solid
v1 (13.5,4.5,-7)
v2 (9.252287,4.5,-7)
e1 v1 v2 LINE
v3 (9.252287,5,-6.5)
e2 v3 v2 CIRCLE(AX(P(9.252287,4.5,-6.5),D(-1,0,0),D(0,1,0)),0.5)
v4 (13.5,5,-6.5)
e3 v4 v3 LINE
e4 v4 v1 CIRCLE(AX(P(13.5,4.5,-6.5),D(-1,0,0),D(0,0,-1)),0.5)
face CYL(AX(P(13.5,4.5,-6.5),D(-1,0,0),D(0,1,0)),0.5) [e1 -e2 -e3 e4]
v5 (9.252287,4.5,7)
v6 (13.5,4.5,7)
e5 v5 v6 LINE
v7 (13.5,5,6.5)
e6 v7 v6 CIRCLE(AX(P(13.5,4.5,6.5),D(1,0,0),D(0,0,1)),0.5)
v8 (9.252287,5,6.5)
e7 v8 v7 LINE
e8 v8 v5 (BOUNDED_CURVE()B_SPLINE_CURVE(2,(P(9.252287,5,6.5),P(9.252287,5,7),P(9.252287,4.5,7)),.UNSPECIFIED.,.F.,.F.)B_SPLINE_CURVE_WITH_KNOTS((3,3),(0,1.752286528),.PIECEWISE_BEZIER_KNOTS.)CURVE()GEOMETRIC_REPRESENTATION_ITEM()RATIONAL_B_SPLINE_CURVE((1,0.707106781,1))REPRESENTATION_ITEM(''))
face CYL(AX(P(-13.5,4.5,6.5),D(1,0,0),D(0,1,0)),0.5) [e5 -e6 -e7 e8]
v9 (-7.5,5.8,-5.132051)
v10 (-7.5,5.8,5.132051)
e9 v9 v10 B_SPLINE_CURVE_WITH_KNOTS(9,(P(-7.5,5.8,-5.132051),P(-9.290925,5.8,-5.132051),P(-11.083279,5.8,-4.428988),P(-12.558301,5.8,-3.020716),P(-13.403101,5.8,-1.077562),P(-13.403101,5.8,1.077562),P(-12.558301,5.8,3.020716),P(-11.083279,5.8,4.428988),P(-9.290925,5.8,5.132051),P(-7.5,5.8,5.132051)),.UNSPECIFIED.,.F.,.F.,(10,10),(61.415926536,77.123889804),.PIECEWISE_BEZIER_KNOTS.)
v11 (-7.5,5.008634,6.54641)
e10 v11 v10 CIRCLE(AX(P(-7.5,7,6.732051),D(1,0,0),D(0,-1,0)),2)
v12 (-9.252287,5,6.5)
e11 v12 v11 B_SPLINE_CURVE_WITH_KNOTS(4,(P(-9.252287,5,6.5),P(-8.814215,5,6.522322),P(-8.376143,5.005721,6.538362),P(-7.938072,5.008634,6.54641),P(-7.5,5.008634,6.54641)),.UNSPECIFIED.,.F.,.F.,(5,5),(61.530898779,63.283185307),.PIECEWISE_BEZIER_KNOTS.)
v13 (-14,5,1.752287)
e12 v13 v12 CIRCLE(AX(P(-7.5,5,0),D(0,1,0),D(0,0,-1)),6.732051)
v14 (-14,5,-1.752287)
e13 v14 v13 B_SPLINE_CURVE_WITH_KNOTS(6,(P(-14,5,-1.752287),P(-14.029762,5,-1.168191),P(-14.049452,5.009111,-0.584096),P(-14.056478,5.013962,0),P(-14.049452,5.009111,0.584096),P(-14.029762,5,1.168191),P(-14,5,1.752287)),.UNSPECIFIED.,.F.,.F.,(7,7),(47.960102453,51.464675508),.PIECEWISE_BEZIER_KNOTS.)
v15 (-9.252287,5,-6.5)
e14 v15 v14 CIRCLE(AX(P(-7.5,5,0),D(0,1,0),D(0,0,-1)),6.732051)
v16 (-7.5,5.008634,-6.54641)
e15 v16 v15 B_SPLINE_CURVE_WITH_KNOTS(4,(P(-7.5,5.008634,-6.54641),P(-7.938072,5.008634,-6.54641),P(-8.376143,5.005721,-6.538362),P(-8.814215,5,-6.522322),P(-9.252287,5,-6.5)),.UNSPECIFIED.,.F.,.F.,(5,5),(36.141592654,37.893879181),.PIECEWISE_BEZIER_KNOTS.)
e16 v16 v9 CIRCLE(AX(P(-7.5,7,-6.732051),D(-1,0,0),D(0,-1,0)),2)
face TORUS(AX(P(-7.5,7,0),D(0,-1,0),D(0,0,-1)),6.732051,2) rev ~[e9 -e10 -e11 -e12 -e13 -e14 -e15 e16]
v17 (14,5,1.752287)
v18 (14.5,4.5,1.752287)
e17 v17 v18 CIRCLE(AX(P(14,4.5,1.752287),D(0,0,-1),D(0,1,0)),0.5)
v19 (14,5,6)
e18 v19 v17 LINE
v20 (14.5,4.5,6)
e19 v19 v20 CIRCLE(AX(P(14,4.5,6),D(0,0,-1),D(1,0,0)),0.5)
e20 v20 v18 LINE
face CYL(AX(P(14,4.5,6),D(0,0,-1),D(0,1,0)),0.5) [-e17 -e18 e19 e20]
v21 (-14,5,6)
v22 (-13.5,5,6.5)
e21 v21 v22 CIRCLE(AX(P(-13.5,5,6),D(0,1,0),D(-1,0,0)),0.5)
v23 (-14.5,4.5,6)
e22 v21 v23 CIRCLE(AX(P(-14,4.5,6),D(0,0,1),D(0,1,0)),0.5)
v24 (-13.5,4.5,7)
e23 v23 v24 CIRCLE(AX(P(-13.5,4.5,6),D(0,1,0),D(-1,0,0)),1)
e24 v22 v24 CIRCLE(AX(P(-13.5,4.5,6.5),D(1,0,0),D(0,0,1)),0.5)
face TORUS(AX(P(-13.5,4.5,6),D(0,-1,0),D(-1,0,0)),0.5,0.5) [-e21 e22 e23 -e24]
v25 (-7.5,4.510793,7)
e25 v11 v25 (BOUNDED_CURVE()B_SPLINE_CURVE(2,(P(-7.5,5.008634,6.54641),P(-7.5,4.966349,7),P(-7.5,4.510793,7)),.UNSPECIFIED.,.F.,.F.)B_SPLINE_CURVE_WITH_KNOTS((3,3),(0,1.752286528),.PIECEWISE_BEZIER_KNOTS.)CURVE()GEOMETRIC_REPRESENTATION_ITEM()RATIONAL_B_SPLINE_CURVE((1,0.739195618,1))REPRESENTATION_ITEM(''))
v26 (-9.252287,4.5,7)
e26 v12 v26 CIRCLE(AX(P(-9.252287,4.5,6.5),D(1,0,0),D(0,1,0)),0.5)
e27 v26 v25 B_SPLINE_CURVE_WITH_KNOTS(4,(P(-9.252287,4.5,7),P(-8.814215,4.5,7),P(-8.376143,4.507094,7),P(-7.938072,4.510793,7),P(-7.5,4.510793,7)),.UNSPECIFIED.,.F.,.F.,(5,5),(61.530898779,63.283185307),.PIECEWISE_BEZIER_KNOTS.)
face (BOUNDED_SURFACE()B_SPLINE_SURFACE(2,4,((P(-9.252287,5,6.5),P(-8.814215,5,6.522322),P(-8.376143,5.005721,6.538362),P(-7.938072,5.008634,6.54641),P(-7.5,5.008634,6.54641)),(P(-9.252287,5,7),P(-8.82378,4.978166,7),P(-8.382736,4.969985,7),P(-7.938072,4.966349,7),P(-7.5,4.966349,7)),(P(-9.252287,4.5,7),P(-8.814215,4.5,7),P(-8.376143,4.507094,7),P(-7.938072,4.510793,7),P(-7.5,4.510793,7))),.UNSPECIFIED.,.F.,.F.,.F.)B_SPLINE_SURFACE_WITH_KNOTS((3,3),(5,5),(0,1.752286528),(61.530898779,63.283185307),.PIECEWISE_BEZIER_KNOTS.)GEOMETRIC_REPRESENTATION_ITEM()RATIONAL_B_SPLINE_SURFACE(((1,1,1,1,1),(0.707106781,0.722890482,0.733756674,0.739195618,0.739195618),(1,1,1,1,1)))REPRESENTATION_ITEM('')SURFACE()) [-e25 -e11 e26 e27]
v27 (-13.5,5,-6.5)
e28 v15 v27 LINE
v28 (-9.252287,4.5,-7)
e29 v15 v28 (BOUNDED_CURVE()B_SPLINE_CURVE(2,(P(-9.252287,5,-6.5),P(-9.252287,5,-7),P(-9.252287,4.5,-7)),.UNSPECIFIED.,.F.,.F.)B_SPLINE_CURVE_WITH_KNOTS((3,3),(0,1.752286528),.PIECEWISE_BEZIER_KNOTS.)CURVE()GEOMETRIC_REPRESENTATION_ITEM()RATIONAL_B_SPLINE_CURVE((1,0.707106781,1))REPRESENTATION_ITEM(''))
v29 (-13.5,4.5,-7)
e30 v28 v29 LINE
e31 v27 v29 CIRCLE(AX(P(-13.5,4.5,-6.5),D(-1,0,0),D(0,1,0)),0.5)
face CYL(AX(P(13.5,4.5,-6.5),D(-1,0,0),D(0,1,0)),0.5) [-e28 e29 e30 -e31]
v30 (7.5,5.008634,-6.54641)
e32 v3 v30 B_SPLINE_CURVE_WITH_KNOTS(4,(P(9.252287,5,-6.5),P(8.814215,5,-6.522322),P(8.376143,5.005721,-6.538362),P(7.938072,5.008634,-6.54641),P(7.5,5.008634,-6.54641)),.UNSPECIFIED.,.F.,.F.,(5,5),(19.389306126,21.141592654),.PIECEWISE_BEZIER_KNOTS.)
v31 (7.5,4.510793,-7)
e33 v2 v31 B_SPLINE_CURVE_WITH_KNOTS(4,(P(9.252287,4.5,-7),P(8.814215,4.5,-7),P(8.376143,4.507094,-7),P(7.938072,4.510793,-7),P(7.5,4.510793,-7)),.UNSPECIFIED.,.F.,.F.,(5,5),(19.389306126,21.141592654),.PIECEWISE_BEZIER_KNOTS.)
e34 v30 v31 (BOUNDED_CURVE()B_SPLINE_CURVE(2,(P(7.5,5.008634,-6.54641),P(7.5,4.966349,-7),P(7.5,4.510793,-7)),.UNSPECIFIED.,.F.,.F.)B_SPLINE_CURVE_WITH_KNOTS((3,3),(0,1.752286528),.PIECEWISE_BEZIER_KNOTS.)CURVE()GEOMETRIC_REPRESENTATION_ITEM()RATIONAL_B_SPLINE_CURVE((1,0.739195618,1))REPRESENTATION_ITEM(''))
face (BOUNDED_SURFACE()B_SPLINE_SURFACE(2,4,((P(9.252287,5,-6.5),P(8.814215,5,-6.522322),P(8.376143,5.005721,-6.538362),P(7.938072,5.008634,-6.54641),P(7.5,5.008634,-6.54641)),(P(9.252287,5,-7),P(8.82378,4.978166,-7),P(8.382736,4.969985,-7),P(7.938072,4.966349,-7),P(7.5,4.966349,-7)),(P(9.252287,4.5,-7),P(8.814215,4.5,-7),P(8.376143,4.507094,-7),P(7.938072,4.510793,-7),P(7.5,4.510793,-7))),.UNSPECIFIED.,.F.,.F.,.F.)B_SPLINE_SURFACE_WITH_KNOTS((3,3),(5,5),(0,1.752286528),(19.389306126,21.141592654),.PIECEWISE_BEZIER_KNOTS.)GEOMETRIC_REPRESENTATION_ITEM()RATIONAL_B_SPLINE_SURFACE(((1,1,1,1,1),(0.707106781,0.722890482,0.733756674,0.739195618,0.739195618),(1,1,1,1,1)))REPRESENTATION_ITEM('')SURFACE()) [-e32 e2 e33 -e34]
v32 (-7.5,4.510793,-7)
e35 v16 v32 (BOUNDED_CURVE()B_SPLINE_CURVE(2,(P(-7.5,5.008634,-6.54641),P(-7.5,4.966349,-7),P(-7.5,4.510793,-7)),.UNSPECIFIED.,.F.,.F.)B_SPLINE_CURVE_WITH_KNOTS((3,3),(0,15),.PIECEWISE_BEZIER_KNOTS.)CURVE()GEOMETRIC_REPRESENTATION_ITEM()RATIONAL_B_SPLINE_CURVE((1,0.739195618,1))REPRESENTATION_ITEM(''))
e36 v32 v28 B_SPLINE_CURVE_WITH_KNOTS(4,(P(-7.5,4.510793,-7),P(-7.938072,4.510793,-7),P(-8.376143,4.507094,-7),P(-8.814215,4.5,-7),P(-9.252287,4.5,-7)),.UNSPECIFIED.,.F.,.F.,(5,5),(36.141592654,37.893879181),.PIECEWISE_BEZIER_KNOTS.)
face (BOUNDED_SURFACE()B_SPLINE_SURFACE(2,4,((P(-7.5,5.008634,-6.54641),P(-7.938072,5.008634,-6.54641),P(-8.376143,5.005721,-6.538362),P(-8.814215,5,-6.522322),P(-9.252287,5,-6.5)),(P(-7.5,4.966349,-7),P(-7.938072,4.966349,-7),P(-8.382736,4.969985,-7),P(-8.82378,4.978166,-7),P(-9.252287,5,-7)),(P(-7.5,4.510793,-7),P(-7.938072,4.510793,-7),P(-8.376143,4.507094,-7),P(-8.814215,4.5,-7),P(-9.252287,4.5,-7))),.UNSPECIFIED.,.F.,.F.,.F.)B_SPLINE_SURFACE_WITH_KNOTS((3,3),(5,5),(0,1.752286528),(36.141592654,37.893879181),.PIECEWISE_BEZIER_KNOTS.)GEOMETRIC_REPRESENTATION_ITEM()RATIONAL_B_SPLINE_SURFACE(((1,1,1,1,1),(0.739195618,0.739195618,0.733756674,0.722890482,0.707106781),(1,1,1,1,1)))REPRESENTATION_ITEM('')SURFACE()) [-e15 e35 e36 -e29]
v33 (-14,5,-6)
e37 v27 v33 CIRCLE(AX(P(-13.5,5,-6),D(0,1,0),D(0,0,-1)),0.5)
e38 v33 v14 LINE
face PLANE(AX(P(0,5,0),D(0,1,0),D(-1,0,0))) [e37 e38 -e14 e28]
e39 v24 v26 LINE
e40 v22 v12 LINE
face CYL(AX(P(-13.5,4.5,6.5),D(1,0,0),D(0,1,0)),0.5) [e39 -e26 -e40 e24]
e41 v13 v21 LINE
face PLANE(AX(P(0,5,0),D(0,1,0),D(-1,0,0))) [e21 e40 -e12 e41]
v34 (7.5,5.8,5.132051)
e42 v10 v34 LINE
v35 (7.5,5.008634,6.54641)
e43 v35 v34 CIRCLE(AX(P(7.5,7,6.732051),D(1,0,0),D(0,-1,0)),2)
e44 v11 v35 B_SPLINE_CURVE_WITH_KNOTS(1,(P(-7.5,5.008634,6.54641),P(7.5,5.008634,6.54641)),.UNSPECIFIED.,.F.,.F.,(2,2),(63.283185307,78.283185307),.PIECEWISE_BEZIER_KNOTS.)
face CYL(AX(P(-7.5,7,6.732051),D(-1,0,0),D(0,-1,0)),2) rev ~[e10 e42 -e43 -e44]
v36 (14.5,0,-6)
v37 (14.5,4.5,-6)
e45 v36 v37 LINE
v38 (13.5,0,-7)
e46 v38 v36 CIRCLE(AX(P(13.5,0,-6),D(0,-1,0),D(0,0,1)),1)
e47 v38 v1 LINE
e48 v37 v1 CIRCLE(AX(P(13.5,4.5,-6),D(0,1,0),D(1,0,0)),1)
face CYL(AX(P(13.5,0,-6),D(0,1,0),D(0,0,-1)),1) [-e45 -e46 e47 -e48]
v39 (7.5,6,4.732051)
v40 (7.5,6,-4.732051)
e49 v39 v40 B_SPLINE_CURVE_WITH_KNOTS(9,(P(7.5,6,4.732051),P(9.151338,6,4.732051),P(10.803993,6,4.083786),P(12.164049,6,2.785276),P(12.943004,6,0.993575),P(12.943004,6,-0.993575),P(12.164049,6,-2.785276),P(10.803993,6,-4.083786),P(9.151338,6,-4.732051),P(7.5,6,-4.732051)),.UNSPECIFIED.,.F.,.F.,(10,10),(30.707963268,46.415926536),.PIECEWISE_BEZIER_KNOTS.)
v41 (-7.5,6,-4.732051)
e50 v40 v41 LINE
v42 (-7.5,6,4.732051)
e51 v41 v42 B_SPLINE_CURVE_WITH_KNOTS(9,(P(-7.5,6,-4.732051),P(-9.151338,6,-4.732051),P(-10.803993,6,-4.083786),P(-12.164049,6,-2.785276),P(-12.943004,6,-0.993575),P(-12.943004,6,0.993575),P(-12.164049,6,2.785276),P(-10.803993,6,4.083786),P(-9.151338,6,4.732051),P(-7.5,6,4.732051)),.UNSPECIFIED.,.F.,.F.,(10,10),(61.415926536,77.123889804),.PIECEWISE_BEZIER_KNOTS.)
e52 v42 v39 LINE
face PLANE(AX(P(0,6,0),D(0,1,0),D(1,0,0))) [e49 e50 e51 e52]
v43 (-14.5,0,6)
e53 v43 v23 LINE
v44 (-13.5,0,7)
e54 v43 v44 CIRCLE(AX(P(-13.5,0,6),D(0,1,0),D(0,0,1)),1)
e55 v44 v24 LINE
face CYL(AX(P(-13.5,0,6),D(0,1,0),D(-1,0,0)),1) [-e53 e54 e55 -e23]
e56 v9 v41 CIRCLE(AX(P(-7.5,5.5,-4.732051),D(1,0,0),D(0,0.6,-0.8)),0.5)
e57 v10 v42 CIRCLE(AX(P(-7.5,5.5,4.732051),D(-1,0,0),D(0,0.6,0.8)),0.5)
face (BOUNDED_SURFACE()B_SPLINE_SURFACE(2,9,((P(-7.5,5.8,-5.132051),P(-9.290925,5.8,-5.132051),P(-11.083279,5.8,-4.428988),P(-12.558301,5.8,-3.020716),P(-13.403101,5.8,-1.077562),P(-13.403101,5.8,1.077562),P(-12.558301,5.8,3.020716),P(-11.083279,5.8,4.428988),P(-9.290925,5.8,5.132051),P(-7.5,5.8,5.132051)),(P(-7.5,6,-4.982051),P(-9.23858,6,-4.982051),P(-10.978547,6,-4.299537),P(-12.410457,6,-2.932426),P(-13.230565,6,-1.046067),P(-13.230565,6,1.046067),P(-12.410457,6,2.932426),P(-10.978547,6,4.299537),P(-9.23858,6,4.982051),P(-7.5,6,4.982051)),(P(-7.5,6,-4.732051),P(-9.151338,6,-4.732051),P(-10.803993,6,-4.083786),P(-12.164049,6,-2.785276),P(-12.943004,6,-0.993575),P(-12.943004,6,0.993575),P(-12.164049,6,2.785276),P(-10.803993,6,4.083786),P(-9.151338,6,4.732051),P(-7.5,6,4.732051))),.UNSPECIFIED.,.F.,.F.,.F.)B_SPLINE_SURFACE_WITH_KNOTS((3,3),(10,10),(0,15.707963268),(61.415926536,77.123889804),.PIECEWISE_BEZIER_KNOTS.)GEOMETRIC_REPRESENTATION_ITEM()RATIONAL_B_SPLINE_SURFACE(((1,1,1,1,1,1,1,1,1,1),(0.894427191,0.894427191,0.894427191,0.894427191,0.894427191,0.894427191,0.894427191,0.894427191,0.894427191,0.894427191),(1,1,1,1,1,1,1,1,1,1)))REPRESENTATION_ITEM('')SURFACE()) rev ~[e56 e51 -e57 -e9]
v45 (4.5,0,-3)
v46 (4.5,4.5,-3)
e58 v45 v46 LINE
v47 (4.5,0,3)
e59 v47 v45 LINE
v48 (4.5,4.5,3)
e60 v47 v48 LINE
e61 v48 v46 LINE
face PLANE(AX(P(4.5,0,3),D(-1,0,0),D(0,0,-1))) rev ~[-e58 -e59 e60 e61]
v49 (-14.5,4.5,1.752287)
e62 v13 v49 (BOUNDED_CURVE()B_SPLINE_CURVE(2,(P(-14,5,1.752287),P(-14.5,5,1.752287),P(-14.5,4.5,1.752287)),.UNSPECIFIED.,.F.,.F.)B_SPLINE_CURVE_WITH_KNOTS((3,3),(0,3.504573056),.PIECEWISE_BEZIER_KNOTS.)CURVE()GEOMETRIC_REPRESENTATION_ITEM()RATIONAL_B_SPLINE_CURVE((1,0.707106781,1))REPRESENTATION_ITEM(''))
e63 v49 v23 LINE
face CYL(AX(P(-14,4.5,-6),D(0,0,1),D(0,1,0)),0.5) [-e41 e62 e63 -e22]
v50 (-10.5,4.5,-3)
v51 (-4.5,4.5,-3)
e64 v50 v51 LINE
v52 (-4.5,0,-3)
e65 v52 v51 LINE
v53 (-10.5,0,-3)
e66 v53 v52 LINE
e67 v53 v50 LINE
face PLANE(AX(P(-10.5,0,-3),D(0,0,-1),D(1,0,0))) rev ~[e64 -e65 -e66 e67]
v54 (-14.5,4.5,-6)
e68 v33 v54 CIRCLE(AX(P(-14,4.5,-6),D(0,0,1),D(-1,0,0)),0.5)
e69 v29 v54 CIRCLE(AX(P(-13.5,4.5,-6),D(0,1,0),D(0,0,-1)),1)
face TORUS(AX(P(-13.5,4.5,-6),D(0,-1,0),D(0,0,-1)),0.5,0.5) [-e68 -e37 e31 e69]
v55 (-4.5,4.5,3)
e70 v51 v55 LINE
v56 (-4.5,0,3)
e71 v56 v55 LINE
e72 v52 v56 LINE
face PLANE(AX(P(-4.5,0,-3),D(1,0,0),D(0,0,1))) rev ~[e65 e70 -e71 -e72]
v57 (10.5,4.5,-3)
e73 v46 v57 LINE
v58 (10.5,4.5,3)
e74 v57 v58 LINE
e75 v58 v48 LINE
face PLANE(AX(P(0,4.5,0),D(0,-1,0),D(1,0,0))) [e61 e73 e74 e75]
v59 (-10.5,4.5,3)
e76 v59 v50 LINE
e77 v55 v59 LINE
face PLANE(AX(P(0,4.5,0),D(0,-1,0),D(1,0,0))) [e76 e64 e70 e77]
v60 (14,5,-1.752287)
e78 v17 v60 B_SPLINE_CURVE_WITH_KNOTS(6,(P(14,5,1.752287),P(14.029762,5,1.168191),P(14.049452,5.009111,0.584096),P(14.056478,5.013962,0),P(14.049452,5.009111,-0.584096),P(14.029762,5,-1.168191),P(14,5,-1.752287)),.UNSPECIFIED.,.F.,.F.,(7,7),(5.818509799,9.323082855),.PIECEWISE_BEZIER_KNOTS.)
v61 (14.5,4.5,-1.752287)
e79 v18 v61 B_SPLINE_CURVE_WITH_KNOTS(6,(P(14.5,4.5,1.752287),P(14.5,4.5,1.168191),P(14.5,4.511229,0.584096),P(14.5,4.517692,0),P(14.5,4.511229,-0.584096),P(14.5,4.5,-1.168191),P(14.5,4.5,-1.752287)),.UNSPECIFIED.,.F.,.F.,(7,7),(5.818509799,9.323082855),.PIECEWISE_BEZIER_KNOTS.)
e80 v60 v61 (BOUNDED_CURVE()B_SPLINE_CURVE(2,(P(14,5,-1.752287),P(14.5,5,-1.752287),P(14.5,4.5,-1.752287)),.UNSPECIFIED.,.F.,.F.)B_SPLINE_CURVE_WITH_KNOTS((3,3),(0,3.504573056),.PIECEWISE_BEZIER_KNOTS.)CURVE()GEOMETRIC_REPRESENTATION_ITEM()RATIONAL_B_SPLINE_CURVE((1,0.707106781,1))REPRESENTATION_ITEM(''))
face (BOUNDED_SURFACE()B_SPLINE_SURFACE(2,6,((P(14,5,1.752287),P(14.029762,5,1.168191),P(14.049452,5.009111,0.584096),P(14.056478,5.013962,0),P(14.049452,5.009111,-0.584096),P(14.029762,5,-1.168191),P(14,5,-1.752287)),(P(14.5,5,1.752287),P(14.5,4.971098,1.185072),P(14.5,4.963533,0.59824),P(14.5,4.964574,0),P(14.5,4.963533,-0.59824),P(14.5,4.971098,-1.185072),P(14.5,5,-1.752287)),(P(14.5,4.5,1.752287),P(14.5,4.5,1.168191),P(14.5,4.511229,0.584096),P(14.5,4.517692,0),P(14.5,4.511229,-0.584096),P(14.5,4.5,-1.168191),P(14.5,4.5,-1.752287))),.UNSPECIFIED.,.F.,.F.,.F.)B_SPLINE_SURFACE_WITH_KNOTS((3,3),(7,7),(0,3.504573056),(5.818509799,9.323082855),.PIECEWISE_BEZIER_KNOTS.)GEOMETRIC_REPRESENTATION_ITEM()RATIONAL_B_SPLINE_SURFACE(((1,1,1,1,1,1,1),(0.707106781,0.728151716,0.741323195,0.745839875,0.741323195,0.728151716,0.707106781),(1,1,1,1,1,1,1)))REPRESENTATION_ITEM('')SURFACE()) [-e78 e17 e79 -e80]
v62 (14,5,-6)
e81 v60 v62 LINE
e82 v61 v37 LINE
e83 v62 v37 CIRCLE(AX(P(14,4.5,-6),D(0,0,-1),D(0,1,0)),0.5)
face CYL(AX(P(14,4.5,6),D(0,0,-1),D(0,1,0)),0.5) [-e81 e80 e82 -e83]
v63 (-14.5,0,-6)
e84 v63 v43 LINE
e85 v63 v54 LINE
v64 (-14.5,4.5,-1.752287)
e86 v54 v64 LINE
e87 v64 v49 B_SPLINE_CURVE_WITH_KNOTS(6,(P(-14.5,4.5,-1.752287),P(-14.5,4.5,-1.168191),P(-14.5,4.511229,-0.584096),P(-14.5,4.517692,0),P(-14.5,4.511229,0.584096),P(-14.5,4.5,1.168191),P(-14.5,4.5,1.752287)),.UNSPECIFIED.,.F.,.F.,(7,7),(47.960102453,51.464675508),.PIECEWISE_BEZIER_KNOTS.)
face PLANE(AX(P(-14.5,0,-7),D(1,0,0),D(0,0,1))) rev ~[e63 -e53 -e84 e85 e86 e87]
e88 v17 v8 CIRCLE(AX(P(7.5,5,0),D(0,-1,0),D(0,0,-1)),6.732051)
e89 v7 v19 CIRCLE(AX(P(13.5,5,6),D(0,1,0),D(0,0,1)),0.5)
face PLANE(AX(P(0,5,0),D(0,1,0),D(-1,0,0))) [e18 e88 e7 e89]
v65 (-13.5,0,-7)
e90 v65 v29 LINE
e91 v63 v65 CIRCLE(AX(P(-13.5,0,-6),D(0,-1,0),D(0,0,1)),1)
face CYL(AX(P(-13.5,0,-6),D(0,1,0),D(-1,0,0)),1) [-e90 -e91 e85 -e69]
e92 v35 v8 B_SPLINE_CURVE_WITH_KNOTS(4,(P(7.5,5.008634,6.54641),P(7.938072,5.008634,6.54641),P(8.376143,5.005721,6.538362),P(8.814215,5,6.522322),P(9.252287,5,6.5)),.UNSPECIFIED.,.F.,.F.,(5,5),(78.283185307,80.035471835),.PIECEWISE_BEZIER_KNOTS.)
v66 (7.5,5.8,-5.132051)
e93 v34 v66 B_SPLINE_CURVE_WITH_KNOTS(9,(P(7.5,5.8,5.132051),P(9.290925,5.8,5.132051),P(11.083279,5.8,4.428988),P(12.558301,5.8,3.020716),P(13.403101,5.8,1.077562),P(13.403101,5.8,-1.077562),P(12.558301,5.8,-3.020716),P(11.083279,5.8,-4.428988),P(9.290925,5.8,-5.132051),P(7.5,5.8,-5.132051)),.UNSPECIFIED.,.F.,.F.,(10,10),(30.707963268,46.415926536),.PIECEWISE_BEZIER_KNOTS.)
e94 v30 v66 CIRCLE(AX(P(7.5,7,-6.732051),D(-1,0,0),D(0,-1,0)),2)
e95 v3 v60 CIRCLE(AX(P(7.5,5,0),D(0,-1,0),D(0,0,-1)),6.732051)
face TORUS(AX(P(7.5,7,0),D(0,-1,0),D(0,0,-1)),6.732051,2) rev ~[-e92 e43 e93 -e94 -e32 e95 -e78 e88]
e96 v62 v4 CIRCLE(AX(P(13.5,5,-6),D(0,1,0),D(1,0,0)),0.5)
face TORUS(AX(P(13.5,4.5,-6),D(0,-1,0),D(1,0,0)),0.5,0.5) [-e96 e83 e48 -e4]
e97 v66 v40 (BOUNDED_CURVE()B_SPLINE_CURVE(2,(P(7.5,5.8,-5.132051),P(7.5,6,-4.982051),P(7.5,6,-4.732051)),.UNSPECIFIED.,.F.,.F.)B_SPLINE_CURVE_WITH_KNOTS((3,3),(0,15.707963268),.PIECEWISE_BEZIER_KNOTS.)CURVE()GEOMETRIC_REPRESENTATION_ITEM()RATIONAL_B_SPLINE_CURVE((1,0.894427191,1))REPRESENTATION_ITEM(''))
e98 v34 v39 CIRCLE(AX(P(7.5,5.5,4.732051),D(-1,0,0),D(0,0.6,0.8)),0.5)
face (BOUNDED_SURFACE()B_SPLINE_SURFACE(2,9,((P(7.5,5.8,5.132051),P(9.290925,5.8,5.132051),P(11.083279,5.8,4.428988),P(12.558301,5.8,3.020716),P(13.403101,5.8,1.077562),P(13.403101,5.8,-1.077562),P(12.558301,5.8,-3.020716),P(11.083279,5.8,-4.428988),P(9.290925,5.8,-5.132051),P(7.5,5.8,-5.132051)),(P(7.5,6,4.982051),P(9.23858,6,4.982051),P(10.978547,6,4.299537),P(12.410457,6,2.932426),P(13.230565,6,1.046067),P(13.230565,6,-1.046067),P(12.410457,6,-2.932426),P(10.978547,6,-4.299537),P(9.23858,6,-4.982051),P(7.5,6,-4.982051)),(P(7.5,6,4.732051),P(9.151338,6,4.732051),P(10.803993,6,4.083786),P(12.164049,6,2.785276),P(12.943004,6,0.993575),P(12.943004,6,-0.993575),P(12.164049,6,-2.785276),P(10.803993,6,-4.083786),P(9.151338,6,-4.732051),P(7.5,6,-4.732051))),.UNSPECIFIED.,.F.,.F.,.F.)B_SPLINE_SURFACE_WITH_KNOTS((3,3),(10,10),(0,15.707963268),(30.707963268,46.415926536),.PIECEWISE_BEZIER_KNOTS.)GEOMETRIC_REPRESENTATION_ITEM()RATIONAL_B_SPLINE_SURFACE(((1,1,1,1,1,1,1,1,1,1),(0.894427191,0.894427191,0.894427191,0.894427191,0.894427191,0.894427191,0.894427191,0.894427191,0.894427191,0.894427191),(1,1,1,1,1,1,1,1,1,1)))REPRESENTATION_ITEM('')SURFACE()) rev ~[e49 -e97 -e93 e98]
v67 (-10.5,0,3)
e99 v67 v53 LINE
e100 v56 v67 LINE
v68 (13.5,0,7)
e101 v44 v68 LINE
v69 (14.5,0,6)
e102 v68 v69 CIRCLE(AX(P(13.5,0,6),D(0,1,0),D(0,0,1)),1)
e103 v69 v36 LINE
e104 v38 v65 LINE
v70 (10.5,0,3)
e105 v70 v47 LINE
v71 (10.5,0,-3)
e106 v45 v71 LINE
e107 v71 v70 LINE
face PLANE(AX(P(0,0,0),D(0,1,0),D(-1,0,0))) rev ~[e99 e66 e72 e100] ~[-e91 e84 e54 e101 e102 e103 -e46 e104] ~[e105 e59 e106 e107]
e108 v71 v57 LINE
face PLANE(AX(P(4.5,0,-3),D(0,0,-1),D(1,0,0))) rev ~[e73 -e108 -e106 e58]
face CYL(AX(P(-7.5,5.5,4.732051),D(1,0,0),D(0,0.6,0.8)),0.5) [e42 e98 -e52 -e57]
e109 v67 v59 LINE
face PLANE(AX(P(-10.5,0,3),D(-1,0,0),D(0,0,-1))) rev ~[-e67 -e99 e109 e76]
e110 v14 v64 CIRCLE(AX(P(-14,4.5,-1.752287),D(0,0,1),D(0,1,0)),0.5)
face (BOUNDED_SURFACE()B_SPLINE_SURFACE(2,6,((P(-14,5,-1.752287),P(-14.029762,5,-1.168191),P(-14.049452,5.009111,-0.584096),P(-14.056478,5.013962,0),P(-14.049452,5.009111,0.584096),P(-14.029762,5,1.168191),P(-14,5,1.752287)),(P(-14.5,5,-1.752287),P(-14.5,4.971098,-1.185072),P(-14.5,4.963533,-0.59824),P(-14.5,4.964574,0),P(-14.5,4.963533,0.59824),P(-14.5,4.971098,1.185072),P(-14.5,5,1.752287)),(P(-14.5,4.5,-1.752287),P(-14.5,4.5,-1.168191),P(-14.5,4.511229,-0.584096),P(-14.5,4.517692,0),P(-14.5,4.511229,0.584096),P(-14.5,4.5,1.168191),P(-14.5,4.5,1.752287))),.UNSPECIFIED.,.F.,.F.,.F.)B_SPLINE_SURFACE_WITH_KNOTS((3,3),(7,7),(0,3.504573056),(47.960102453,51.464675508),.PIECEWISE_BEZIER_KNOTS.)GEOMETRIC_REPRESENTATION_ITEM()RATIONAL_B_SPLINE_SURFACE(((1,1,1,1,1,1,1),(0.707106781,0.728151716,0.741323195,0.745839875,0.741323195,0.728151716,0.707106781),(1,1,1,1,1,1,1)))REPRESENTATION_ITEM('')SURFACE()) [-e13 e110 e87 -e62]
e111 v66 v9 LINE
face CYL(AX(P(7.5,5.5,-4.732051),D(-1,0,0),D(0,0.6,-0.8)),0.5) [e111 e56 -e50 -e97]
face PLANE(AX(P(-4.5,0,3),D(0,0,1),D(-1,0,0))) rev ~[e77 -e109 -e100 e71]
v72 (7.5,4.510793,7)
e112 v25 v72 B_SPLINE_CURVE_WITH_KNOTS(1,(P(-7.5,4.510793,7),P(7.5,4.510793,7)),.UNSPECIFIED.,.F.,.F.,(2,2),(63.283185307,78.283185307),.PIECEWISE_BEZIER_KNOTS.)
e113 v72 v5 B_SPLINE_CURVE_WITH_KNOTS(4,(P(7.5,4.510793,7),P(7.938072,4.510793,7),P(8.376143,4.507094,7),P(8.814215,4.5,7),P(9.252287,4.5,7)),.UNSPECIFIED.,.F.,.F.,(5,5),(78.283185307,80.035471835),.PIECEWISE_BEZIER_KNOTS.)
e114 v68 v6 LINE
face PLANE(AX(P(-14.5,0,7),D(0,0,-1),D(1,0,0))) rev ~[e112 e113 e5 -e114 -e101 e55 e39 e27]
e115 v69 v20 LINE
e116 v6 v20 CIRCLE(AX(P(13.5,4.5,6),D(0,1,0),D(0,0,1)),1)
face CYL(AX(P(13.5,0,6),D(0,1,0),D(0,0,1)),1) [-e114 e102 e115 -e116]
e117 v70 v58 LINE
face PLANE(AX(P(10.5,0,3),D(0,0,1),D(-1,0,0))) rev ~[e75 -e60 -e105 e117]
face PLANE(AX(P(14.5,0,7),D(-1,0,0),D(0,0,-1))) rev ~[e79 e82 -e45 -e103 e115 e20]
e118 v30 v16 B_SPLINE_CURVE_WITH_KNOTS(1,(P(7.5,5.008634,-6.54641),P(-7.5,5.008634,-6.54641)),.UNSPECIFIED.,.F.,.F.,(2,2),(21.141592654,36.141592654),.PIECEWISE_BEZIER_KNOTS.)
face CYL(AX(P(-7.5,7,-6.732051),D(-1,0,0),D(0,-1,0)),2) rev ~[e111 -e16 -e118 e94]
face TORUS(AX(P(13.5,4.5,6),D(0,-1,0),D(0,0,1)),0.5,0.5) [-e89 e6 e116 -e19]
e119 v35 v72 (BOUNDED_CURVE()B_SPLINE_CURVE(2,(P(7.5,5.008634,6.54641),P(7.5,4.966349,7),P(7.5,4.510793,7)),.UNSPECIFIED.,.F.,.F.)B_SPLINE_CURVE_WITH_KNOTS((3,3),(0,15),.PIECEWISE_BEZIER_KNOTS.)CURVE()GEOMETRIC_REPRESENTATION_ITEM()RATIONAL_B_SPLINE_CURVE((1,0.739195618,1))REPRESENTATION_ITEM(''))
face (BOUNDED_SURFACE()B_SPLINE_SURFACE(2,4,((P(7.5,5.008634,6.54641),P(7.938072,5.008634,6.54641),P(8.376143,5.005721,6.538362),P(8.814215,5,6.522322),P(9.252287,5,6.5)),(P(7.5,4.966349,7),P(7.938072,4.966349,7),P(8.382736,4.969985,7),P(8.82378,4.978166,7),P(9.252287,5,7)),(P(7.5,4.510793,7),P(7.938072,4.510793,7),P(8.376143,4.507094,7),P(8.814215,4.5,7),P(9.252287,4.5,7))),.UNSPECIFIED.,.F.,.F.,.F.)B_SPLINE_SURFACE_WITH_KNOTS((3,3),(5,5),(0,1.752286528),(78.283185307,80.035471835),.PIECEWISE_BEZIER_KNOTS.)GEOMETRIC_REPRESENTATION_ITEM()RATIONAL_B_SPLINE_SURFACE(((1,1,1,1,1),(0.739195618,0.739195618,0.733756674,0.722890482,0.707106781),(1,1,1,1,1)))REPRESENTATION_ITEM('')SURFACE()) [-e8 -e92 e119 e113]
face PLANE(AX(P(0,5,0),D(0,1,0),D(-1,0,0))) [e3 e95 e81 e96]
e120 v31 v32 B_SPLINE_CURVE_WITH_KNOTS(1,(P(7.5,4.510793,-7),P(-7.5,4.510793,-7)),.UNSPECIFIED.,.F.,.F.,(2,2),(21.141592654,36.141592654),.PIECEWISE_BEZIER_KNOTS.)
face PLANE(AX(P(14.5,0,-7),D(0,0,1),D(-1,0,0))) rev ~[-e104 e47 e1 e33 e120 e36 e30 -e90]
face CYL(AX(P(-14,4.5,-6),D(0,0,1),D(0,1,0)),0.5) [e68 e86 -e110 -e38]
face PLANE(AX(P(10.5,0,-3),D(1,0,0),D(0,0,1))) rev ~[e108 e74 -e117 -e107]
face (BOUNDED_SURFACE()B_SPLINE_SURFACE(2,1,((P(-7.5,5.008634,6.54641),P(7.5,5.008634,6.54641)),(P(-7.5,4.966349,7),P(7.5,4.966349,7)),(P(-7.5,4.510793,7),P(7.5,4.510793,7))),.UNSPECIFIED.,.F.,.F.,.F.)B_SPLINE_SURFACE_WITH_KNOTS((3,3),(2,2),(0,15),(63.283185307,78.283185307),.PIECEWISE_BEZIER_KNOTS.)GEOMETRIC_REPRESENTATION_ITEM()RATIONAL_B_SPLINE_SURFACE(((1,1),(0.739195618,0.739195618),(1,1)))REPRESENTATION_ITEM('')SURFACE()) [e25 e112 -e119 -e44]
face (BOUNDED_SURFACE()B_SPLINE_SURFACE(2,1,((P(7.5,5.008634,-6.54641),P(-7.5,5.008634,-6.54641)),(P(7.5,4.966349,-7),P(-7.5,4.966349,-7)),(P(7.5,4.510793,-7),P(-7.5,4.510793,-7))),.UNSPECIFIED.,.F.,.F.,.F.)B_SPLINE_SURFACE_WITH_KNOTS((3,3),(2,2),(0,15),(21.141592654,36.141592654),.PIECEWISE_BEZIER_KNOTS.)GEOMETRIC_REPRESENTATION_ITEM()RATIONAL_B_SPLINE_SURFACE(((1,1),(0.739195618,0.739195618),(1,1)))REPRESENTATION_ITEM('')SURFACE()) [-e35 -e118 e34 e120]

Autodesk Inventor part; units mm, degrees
ref_plane "YZ Plane" through (0, 0, 0) normal (1, 0, 0) x (0, 1, 0)
ref_plane "XZ Plane" through (0, 0, 0) normal (0, 1, 0) x (-1, 0, 0)
ref_plane "XY Plane" through (0, 0, 0) normal (0, 0, 1) x (1, 0, 0)
sketch "Sketch1" plane through (0, 0, 0) normal (0, 1, 0) x (-1, 0, 0)
  line L0 (14.5, 7) -> (-14.5, 7)
  line L1 (-14.5, 7) -> (-14.5, -7)
  line L2 (-14.5, -7) -> (14.5, -7)
  line L3 (14.5, -7) -> (14.5, 7)
  point P0 (0, 0)
  dimension "d0" = 29
  dimension "d1" = 14
  dimension "d2" = 7
  dimension "d3" = 14.5
extrude "Extrusion1" add sketch "Sketch1" along normal blind 5
sketch "Sketch2" plane through (0, 5, 0) normal (0, 1, 0) x (1, 0, 0)
  circle A0 centre (-7.5, 0) radius 5
  circle A1 centre (7.5, 0) radius 5
  line L0 (-14.5, 7) -> (-14.5, -7) projected
  line L1 (14.5, 7) -> (-14.5, 7) projected
  line L2 (14.5, -7) -> (14.5, 7) projected
  line L3 (-7.5, -5) -> (7.5, -5)
  line L4 (-7.5, 5) -> (7.5, 5)
  point P0 (0, 0)
  dimension "d6" = 10
  dimension "d7" = 10
  dimension "d8" = 7
  dimension "d9" = 7
  dimension "d10" = 7
  dimension "d11" = 7
  dimension "d12" = 5
  dimension "d13" = 5
extrude "Extrusion2" add sketch "Sketch2" along normal blind 1
fillet "Fillet1" radius 2 4 edges at (-12.5, 5, 0) (0, 5, -5) (12.5, 5, 0) (0, 5, 5)
fillet "Fillet2" radius 1 4 edges at (14.5, 2.5, 7) (14.5, 2.5, -7) (-14.5, 2.5, -7) (-14.5, 2.5, 7)
fillet "Fillet3" radius 0.5 12 edges at (14.2071, 5, 6.7071) (14.5, 5, 0) (14.2071, 5, -6.7071) (0, 5, -7) (-14.2071, 5, -6.7071) (-14.5, 5, 0) (-14.2071, 5, 6.7071) (0, 5, 7) (-12.5, 6, 0) (0, 6, 5) (12.5, 6, 0) (0, 6, -5)
sketch "Sketch6" plane through (0, 0, 0) normal (0, -1, 0) x (1, 0, 0)
  line L0 (10.5, 3) -> (4.5, 3)
  line L1 (4.5, 3) -> (4.5, -3)
  line L2 (4.5, -3) -> (10.5, -3)
  line L3 (10.5, -3) -> (10.5, 3)
  line L4 (-4.5, 3) -> (-10.5, 3)
  line L5 (-10.5, 3) -> (-10.5, -3)
  line L6 (-10.5, -3) -> (-4.5, -3)
  line L7 (-4.5, -3) -> (-4.5, 3)
  line L8 (-13.5, 7) -> (13.5, 7) projected
  line L9 (14.5, 6) -> (14.5, -6) projected
  line L10 (-14.5, -6) -> (-14.5, 6) projected
  point P0 (0, 0)
  dimension "d43" = 6
  dimension "d44" = 6
  dimension "d45" = 6
  dimension "d46" = 6
  dimension "d47" = 4
  dimension "d48" = 4
  dimension "d49" = 4
  dimension "d50" = 4
extrude "Extrusion7" cut sketch "Sketch6" against normal blind 4.5
properties part number "Keyboard Button"
